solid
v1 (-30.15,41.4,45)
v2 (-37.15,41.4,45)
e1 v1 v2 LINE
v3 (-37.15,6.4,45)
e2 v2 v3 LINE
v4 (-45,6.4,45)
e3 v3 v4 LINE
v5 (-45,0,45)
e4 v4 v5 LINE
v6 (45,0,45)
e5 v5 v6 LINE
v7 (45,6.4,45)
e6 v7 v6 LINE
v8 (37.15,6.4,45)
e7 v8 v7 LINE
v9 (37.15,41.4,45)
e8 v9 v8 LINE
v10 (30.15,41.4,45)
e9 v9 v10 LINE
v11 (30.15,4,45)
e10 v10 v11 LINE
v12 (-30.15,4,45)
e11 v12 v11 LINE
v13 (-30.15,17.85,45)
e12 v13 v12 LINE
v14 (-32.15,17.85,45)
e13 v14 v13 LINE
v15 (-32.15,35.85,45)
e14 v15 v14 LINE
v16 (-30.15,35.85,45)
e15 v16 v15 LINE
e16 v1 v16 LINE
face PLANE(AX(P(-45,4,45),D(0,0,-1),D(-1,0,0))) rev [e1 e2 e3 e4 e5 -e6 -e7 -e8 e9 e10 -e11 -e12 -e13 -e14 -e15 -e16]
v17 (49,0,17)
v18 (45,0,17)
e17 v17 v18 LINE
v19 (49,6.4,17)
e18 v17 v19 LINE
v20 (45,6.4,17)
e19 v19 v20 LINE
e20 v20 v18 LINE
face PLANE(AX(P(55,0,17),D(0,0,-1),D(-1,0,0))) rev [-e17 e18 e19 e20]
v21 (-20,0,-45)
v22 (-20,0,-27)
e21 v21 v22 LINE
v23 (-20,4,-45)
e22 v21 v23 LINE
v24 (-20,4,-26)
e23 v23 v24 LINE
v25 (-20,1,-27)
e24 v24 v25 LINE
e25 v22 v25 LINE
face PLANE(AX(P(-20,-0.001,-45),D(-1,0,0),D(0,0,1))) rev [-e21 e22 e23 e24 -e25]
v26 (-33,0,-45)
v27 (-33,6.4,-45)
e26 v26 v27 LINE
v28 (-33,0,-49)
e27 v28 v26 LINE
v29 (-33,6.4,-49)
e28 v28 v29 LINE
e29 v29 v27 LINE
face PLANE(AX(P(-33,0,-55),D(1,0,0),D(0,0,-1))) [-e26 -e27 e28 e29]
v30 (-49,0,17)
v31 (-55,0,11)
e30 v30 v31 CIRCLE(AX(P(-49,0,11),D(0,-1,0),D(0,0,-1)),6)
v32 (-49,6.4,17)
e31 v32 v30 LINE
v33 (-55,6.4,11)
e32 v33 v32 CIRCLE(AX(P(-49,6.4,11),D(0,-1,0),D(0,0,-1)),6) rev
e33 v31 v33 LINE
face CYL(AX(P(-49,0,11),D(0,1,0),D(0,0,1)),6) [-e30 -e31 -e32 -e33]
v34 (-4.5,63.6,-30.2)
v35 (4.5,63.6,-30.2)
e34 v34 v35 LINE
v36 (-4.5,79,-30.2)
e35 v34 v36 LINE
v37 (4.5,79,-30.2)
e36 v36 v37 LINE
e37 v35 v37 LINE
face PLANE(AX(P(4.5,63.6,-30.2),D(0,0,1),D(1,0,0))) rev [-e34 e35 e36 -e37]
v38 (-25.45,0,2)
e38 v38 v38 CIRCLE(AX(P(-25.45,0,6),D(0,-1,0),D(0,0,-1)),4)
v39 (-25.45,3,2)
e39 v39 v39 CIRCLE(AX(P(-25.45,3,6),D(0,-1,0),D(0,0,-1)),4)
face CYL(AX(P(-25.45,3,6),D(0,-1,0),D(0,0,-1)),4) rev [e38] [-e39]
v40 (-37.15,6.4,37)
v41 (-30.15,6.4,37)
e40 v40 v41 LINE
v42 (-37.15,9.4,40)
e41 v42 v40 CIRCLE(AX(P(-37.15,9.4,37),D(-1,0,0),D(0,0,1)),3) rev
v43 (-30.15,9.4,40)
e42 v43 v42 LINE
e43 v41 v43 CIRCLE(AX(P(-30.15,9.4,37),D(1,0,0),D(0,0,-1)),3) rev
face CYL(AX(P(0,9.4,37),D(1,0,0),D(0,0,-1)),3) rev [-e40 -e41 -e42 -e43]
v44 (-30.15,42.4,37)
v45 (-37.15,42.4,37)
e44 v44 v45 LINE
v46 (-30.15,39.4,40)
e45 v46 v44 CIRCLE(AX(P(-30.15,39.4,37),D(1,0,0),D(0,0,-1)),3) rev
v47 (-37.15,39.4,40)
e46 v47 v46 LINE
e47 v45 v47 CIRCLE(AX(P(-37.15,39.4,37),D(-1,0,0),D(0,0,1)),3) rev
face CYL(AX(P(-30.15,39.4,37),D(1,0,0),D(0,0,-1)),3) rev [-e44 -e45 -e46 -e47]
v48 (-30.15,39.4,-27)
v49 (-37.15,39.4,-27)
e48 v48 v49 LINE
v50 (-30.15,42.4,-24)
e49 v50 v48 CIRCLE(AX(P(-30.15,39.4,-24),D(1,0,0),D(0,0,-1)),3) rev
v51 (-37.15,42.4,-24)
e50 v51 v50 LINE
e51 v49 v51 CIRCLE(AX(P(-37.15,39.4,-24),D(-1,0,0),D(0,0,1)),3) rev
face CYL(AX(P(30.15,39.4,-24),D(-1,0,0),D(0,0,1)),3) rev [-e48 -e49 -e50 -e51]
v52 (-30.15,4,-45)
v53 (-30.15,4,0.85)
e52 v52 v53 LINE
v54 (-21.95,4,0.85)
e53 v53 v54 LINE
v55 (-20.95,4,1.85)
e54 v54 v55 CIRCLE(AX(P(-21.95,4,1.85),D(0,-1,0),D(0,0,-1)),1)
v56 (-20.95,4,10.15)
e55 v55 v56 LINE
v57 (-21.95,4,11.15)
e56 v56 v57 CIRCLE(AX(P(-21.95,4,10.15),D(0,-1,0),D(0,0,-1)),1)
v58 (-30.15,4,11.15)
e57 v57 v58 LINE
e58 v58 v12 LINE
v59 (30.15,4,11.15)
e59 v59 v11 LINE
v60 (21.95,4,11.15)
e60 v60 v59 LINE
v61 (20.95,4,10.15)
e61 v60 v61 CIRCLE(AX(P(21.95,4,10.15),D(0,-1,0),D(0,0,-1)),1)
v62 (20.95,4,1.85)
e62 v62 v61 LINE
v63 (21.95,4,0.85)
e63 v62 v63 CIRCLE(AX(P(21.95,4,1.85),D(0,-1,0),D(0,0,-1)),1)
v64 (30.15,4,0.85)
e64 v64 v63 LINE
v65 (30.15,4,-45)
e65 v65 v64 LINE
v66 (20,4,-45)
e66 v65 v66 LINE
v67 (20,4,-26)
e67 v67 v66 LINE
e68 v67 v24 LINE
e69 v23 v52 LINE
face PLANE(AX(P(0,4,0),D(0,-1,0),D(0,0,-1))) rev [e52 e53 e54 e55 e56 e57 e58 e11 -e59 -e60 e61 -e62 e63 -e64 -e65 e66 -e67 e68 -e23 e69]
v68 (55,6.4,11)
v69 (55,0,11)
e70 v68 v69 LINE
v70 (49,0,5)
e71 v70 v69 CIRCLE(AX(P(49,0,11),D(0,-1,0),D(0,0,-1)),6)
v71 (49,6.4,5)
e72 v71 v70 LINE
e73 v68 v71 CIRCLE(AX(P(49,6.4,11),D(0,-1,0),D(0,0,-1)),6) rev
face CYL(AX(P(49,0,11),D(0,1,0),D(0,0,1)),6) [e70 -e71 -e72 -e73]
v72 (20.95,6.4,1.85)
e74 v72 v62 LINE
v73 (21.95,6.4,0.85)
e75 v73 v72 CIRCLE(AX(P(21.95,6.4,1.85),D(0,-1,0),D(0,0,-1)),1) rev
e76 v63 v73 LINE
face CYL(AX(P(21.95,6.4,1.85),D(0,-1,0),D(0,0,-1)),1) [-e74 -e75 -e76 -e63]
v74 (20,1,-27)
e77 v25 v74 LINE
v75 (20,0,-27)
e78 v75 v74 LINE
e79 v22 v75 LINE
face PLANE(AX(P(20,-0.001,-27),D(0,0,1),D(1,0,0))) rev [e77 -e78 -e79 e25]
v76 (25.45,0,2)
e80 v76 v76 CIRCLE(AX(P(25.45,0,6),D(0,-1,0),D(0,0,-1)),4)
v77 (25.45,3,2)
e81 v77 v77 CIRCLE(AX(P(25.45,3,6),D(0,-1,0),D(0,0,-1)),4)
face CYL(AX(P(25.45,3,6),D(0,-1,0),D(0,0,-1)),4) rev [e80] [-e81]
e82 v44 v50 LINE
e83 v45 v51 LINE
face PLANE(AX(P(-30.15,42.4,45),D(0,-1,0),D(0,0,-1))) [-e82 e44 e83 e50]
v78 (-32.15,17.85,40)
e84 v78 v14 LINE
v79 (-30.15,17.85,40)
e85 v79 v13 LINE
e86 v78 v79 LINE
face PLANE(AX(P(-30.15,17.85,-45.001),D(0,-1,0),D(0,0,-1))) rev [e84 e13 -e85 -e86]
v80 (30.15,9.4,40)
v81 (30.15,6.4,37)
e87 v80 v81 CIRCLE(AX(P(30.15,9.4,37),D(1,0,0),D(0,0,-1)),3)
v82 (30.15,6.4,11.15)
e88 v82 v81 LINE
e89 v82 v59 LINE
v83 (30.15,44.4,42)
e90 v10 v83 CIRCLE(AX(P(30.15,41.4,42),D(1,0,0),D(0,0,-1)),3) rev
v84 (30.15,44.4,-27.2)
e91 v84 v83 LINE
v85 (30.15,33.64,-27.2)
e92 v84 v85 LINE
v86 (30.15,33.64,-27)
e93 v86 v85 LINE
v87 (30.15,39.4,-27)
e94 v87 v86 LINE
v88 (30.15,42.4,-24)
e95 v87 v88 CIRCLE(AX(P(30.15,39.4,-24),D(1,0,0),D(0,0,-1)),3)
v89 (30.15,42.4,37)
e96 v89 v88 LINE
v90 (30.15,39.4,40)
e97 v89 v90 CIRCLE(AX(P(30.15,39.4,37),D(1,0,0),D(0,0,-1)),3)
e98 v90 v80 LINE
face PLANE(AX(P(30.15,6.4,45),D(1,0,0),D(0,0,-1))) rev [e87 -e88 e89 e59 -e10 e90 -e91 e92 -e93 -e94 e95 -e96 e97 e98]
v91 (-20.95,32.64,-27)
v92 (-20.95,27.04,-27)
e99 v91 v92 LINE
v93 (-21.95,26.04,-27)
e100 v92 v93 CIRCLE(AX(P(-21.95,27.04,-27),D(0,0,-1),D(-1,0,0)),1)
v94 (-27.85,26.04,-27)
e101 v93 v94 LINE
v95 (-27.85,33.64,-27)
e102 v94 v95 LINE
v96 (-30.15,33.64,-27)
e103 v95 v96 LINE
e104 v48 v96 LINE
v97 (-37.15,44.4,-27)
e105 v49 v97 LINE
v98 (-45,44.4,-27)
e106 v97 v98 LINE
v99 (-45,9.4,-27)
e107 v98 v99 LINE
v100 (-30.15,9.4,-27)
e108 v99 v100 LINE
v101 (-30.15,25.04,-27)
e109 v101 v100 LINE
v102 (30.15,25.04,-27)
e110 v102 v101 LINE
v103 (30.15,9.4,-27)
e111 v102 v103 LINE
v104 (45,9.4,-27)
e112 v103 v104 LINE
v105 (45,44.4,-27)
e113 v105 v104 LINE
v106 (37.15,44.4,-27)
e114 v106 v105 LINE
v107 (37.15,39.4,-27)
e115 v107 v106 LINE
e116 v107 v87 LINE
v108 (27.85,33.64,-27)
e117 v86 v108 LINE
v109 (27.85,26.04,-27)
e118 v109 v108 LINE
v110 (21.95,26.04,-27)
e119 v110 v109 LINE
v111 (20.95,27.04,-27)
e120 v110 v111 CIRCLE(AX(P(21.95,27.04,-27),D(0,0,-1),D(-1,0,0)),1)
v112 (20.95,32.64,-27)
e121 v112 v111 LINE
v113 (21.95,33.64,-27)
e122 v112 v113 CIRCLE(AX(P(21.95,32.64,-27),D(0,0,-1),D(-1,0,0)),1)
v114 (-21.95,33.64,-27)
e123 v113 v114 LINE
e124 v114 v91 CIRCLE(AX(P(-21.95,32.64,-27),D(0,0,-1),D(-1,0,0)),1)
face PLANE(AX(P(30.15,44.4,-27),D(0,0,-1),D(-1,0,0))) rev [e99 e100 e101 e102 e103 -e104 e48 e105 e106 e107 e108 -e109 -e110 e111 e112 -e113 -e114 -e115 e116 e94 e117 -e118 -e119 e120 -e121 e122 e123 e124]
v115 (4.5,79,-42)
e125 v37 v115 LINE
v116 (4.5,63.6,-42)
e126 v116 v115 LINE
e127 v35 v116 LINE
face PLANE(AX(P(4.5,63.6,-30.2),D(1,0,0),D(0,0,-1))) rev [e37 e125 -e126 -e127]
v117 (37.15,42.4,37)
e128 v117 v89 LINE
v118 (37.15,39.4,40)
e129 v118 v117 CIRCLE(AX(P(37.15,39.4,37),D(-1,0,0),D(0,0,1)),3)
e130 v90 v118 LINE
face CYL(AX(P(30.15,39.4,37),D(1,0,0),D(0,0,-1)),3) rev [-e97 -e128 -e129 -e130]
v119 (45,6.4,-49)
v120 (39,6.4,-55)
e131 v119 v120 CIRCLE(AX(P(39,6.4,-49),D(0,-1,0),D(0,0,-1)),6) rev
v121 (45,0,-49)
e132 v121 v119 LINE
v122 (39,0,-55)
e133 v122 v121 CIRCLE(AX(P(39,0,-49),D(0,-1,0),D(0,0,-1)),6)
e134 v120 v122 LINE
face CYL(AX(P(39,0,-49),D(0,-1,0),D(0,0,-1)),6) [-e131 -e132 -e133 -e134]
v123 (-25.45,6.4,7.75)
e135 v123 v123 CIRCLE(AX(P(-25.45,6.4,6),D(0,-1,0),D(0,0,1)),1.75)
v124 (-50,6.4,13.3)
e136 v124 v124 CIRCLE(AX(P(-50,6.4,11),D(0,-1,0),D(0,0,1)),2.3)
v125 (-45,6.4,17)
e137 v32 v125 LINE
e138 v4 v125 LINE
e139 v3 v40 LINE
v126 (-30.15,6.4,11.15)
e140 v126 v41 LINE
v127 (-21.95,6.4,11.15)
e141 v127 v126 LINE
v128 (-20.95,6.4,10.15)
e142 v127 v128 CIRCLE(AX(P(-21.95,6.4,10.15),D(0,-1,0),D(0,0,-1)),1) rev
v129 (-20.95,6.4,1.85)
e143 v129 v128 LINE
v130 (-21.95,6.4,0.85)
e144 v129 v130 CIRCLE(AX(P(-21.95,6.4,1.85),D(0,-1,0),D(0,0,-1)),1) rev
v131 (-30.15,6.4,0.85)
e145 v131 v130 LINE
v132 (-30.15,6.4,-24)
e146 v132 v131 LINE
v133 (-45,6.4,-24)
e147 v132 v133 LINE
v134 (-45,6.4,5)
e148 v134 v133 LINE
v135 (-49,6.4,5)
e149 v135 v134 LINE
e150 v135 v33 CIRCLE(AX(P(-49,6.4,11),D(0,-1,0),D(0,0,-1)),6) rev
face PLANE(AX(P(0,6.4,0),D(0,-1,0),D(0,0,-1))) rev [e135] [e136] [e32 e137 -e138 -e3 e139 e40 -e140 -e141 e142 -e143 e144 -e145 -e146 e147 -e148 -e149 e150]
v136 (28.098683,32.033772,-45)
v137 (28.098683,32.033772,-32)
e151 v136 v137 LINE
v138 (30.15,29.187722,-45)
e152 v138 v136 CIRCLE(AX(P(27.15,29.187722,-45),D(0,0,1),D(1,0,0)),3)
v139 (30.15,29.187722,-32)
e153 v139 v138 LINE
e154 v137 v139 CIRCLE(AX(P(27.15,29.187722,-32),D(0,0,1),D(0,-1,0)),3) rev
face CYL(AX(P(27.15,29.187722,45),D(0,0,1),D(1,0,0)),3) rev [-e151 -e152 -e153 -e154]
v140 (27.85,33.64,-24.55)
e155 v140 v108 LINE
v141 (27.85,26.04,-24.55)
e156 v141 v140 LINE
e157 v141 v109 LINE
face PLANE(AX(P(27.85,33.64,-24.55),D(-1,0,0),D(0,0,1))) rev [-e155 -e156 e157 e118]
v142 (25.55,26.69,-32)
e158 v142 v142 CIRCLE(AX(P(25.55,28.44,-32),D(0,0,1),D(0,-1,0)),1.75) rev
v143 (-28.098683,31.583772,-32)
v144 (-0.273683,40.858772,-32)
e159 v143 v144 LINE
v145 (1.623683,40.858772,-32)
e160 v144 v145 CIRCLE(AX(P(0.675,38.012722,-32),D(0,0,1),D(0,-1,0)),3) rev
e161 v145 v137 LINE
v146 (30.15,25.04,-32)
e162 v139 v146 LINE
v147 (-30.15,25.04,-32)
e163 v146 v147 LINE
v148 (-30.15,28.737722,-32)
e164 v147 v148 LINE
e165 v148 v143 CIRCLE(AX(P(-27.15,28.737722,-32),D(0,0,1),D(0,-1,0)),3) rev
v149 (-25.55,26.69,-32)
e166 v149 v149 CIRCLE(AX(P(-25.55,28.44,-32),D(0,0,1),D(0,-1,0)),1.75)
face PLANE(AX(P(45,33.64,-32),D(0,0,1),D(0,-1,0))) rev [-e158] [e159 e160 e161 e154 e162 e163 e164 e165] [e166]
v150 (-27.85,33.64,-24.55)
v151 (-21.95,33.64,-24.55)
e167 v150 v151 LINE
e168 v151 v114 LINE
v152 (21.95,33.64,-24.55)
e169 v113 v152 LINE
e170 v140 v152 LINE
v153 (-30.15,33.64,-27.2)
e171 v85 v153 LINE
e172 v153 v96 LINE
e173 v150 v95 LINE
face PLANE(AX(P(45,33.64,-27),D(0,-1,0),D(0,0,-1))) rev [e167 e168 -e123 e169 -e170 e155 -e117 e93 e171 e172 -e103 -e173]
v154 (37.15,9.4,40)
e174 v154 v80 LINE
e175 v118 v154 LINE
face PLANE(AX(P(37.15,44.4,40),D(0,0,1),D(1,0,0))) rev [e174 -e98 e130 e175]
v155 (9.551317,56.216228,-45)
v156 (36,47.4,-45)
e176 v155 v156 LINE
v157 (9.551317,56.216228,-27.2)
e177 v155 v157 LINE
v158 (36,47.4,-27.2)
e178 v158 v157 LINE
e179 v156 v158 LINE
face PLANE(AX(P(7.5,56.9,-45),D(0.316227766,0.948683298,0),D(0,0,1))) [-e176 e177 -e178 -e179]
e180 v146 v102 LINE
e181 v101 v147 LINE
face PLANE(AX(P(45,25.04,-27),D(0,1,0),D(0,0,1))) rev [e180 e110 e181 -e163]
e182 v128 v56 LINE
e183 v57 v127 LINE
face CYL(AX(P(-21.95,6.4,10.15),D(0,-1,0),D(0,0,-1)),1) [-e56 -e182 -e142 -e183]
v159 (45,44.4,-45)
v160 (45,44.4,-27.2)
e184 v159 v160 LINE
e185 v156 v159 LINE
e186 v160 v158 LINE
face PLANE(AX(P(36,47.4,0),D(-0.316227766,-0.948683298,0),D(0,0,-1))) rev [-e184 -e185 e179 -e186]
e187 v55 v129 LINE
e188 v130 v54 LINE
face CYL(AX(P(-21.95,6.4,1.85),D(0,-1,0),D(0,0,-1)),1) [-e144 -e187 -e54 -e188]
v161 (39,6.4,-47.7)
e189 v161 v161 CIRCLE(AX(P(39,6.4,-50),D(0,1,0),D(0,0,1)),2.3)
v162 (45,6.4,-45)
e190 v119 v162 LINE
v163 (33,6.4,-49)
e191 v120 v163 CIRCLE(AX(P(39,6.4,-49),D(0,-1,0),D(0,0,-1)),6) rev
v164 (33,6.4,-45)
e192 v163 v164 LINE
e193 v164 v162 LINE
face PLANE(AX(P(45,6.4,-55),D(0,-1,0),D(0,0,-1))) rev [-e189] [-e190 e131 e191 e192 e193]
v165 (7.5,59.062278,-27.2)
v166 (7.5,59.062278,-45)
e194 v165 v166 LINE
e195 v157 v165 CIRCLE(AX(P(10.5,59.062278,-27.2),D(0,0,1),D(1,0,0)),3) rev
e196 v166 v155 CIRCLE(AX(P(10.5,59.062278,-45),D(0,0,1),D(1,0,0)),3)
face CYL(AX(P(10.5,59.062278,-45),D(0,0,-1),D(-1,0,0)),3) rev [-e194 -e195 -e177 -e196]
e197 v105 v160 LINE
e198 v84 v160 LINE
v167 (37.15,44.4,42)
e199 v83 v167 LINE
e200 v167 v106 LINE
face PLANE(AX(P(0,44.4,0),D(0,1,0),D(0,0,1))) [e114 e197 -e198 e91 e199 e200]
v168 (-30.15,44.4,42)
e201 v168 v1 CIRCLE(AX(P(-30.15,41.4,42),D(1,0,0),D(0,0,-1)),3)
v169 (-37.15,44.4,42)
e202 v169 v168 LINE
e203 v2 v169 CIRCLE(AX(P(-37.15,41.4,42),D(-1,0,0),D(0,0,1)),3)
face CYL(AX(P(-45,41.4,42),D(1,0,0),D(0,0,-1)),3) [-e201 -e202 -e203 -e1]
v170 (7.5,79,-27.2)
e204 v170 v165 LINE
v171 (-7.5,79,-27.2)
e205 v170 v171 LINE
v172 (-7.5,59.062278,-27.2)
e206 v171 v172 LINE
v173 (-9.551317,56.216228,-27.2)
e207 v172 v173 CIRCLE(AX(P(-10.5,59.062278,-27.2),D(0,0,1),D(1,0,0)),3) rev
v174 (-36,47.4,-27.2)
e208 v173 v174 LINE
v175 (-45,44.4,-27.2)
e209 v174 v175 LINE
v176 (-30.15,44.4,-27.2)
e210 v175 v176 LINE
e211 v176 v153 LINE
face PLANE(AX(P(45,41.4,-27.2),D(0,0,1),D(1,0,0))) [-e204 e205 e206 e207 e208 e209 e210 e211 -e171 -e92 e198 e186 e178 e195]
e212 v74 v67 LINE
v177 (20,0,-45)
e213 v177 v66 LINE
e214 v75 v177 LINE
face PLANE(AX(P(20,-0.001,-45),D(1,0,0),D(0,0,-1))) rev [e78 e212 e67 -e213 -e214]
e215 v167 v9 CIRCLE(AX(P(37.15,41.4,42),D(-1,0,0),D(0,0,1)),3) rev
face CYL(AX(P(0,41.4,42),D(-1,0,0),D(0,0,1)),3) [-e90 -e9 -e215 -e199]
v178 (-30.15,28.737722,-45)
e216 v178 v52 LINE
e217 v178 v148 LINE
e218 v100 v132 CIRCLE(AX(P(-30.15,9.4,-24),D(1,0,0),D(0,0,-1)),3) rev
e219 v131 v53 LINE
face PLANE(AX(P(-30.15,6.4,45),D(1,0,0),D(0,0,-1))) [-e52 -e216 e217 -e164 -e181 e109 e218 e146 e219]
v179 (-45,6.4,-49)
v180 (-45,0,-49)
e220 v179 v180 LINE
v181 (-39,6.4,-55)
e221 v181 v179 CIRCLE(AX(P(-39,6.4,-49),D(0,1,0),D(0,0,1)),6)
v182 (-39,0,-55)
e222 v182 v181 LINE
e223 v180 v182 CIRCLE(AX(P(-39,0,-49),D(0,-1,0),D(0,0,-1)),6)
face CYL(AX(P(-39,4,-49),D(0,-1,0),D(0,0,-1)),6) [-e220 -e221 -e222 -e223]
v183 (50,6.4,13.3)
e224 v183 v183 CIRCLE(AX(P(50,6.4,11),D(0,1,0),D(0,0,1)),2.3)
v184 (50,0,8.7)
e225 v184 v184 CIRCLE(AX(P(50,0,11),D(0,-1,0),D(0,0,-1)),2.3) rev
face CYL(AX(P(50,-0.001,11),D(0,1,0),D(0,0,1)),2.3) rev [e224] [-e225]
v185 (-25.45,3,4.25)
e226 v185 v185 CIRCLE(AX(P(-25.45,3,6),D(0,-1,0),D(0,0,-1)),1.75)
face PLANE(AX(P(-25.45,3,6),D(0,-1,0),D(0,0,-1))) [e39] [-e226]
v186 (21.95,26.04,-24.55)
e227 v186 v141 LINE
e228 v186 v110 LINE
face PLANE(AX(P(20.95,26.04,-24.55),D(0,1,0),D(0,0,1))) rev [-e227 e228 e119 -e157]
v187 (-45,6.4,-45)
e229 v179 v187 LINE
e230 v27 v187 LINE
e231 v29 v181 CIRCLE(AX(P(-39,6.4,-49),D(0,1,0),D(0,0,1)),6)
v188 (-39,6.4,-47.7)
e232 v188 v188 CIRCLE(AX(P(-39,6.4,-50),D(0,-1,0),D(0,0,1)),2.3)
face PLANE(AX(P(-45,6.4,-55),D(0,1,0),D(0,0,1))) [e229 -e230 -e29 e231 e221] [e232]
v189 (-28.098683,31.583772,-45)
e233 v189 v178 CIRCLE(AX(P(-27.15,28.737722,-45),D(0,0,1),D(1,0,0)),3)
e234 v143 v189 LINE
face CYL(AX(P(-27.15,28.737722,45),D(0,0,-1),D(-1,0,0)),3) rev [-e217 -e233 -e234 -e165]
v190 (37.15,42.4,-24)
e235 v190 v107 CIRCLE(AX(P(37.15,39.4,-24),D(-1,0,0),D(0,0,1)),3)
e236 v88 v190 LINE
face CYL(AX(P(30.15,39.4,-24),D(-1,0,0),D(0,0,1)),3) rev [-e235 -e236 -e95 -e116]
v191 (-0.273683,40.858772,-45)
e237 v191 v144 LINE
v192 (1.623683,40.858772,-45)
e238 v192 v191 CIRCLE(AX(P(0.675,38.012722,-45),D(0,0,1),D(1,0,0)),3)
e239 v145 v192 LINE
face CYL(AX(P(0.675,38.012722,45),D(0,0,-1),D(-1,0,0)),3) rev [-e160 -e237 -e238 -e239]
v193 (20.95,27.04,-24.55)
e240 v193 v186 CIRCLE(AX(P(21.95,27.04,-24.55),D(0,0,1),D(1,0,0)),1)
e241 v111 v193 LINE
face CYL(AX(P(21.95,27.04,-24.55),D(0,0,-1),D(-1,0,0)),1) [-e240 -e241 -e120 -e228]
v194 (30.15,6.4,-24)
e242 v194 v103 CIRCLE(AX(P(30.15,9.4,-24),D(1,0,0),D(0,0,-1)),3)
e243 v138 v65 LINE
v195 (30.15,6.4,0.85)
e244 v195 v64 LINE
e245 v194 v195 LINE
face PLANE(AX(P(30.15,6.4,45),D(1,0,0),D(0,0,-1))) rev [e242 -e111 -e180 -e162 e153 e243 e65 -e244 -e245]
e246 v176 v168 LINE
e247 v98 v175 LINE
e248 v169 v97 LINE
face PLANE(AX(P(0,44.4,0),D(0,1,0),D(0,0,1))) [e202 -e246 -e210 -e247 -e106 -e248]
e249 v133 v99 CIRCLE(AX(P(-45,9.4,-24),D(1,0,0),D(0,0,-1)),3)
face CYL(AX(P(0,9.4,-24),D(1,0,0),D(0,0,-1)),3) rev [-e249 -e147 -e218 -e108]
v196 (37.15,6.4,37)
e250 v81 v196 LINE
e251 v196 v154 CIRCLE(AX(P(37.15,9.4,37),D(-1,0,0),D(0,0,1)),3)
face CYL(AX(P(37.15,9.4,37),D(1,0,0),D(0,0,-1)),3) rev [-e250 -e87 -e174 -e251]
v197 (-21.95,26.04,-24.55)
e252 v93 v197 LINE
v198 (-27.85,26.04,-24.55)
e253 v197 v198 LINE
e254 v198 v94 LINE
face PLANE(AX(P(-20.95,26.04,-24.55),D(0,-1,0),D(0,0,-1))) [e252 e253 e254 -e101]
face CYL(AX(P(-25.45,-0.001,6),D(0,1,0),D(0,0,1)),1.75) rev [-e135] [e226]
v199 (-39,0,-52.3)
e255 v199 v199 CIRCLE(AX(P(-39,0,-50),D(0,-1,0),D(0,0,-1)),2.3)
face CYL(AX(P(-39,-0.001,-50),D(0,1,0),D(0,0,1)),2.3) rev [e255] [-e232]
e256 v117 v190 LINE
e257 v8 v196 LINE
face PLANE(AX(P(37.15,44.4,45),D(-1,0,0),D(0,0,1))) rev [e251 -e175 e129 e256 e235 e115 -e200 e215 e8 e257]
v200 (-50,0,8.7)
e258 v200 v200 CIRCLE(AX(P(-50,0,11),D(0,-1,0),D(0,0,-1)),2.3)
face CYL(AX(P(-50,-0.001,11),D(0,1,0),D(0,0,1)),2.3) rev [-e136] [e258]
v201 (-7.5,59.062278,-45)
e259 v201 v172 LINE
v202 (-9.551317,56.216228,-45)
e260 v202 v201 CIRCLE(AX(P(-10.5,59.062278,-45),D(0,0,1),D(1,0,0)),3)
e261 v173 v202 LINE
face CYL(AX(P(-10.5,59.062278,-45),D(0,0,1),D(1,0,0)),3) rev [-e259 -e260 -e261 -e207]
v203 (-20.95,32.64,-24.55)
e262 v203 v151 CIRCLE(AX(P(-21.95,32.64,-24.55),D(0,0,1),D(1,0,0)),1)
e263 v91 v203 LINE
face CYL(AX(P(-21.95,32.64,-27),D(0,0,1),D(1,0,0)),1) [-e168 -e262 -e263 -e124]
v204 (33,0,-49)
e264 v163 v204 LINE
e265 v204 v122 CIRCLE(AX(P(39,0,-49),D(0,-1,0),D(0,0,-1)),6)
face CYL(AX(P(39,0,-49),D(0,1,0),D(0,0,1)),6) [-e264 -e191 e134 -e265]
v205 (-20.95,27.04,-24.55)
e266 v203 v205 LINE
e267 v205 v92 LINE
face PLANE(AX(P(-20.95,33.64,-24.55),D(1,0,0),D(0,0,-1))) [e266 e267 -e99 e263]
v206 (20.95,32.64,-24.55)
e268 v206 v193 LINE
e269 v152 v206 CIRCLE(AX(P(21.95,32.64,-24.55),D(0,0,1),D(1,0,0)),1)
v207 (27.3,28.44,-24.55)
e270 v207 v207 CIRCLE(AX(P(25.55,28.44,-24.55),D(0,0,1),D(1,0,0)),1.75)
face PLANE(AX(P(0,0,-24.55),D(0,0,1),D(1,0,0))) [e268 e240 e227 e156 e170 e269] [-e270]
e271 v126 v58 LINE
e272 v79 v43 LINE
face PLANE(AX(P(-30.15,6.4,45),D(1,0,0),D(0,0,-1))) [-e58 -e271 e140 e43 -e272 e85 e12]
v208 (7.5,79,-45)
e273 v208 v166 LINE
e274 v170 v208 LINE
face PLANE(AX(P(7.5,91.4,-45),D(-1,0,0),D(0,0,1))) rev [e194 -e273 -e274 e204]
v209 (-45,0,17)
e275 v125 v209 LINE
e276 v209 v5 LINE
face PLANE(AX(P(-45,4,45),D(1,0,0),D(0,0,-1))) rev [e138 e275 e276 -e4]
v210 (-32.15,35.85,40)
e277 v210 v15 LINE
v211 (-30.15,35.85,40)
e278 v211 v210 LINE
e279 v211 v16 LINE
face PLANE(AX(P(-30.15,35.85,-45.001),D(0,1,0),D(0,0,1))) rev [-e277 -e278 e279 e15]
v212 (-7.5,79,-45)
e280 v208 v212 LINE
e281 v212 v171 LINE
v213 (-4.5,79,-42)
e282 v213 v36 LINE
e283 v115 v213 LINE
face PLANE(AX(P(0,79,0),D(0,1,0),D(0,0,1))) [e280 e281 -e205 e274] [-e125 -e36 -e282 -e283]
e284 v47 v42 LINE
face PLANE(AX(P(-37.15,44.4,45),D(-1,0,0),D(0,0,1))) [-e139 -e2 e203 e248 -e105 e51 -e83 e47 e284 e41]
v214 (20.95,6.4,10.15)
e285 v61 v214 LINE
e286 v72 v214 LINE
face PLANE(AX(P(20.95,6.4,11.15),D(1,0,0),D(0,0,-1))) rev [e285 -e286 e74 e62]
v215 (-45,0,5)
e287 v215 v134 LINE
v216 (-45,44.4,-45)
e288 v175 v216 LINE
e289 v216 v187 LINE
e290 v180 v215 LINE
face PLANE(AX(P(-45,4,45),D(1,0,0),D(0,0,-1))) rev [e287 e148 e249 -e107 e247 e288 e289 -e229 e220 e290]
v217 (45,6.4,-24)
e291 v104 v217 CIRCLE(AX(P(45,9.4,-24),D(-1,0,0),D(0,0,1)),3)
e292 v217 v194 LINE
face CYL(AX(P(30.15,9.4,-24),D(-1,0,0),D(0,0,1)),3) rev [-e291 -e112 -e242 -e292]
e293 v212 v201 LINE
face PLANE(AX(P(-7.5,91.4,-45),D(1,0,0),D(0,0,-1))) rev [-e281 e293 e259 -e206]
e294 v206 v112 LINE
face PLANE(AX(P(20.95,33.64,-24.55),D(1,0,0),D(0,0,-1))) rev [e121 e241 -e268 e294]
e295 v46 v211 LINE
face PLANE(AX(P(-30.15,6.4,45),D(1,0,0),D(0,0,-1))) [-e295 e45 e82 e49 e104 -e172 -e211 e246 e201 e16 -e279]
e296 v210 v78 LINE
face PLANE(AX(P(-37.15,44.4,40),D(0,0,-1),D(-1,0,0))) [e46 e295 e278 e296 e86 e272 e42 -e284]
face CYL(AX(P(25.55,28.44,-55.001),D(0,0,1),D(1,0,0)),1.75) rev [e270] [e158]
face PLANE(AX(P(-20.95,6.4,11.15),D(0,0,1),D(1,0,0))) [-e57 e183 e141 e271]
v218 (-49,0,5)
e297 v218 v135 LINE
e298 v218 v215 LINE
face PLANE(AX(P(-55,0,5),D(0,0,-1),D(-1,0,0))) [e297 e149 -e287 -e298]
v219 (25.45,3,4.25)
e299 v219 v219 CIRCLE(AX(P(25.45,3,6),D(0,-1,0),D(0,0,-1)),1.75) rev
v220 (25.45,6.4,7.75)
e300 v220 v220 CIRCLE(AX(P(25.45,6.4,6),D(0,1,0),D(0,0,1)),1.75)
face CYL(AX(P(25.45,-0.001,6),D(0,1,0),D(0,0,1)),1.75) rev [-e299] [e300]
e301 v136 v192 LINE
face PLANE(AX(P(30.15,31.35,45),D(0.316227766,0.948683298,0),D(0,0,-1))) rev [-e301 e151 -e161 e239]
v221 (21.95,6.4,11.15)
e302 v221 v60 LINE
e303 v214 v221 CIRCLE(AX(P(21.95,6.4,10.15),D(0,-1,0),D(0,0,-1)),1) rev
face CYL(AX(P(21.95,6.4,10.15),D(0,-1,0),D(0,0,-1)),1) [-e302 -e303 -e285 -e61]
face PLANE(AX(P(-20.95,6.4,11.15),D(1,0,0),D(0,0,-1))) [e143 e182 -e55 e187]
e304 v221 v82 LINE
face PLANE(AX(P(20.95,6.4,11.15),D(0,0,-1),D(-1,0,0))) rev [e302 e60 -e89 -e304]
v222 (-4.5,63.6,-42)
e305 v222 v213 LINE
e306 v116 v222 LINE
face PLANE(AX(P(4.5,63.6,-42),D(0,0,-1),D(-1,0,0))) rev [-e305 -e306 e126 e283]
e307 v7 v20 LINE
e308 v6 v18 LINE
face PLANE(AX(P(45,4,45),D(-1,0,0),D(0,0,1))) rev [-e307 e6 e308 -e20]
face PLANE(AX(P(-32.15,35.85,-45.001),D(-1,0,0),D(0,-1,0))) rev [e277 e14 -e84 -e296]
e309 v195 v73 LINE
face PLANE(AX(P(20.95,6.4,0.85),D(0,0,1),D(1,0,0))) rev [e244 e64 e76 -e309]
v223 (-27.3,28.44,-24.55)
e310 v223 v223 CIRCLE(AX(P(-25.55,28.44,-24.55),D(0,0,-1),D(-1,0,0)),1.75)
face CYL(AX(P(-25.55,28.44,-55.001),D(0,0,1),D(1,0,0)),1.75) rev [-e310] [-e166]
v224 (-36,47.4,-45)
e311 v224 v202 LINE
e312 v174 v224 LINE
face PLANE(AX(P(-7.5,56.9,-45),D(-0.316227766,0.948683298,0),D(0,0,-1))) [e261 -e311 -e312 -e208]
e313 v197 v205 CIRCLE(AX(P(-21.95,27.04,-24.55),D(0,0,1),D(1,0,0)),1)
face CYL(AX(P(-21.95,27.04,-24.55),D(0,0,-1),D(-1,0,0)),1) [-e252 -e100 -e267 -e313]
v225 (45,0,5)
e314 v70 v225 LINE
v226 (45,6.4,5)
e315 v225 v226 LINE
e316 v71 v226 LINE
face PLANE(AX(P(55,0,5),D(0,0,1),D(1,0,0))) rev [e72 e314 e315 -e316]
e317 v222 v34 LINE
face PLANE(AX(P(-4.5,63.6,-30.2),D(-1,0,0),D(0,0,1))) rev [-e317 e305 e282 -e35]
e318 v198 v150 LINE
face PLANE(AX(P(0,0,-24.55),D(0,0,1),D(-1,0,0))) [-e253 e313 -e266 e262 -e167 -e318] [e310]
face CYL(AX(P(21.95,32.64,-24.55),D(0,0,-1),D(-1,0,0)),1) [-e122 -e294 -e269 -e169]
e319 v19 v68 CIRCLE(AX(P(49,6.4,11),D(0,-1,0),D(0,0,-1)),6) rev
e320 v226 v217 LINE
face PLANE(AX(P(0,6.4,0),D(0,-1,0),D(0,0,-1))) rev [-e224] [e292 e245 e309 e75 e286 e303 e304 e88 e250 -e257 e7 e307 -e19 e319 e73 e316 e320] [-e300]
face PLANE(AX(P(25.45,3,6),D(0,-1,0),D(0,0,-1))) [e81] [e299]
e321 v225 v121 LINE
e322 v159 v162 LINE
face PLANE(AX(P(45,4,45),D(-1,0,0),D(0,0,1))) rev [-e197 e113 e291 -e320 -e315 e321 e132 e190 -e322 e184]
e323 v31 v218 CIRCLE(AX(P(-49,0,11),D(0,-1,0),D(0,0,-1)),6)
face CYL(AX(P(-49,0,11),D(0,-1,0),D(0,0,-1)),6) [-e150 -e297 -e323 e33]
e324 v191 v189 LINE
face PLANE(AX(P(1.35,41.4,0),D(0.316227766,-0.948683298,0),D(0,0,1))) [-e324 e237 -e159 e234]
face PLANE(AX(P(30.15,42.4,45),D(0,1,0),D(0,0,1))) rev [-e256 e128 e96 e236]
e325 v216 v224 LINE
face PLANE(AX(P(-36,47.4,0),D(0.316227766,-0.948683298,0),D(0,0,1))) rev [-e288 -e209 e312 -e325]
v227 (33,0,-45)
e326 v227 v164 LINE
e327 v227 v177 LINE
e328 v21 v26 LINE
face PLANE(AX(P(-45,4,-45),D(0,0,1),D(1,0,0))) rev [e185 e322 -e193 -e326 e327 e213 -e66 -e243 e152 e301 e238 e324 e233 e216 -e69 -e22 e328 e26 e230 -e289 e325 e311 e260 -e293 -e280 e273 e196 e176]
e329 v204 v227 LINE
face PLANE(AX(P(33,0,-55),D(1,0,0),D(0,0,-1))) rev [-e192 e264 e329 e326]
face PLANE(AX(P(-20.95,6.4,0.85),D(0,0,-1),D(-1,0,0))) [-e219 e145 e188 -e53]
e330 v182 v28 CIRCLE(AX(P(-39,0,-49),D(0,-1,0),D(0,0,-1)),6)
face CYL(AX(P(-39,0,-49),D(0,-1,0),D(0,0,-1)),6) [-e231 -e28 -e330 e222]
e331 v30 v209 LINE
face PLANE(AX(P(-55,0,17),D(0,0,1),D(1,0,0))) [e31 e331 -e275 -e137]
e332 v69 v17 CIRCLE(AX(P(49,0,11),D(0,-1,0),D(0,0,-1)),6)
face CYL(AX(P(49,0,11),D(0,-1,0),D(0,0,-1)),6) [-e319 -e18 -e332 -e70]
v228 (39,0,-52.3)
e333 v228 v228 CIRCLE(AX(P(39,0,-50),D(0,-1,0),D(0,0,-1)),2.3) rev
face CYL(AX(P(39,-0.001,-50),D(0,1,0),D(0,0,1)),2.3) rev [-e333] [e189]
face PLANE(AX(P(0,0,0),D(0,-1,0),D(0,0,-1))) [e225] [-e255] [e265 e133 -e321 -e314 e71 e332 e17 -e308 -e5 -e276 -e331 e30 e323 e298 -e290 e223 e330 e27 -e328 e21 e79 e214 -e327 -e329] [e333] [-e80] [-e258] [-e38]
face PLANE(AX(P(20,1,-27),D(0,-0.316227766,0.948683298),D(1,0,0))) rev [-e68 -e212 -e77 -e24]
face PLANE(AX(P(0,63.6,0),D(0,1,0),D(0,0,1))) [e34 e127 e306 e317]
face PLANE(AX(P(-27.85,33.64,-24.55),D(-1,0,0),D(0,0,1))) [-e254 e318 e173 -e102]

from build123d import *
from OCP.BRepFilletAPI import BRepFilletAPI_MakeChamfer

# Parameters (mm, degrees)
ESQUISSE2_W              = 90
ESQUISSE2_H              = 90
BOSS_EXTRU_1_DEPTH       = 4
ESQUISSE3_W              = 9.2
ESQUISSE3_H              = 10.3
BOSS_EXTRU_2_DEPTH       = 2.4
CONG_1_R                 = 1
ESQUISSE5_W              = 14.85
ESQUISSE5_H              = 90
BOSS_EXTRU_3_DEPTH       = 2.4
ESQUISSE6_W              = 7
ESQUISSE6_H              = 5
BOSS_EXTRU_4_DEPTH       = 38
ESQUISSE8_W              = 14.85
ESQUISSE8_H              = 18
BOSS_EXTRU_5_DEPTH       = 38
BOSS_EXTRU_6_REACH       = 97.814
ESQUISSE9_W              = 7
ESQUISSE9_H              = 2
SYM_TRIE1_START          = 4
SYM_TRIE1_OUTLINE_W      = 7
SYM_TRIE1_OUTLINE_H      = 5
SYM_TRIE1_OUTLINE_W_2    = 14.85
SYM_TRIE1_OUTLINE_H_2    = 18
SYM_TRIE1_DEPTH          = 40.4
SYM_TRIE1_2_DEPTH        = 2.4
SYM_TRIE1_START_2        = 42.4
SYM_TRIE1_3_OUTLINE_W    = 7
SYM_TRIE1_3_OUTLINE_H    = 67
SYM_TRIE1_3_DEPTH        = 2
ENL_V_MAT_EXTRU_1_REACH  = 111.983
ESQUISSE10_W             = 2
ESQUISSE10_H             = 18
ENL_V_MAT_EXTRU_2_REACH  = 77.38
ESQUISSE11_W             = 40
ESQUISSE11_H             = 18
ESQUISSE12_W             = 5
ESQUISSE12_H             = 8.6
BOSS_EXTRU_7_DEPTH       = 60.3
ESQUISSE13_W             = 6.9
ESQUISSE13_H             = 7.6
BOSS_EXTRU_8_DEPTH       = 2.45
CONG_2_R                 = 1
CONG_2_OF_SYM_TRIE2_R    = 1
BOSS_EXTRU_9_START       = -3
ESQUISSE14_W             = 90
ESQUISSE14_H             = 17.8
BOSS_EXTRU_9_DEPTH       = 6
ESQUISSE15_W             = 15
ESQUISSE15_H             = 17.8
BOSS_EXTRU_10_DEPTH      = 44
ESQUISSE16_W             = 90
ESQUISSE16_H             = 90
BOSS_EXTRU_11_DEPTH      = 11.6
ESQUISSE20_W             = 12
ESQUISSE20_H             = 6.4
BOSS_EXTRU_13_DEPTH      = 10
ESQUISSE21_W             = 12
ESQUISSE21_H             = 6.4
BOSS_EXTRU_14_DEPTH      = 10
CONG_3_R                 = 6
ENL_V_MAT_EXTRU_4_REACH  = 126.022
ESQUISSE23_R             = 2.3
CONG_3_OF_SYM_TRIE3_R    = 6
ENL_V_MAT_EXTRU_5_REACH  = 126.022
ESQUISSE24_R             = 1.75
ENL_V_MAT_EXTRU_6_REACH  = 137.909
ESQUISSE26_R             = 1.75
ESQUISSE27_W             = 50
ESQUISSE27_H             = 4
ENL_V_MAT_EXTRU_7_DEPTH  = 72.2
CHANFREIN3_SIZE          = 28.5
CHANFREIN3_SIZE2         = 9.5
CHANFREIN4_SIZE          = 10
CHANFREIN4_SIZE2         = 17.5
CHANFREIN8_START         = -45
CHANFREIN8_DEPTH         = 17.8
CHANFREIN9_SIZE          = 3
CHANFREIN9_SIZE_2        = 9
CHANFREIN10_START        = 25.930676813
CHANFREIN10_OUTLINE_W    = 40
CHANFREIN10_OUTLINE_H    = 3.16227766
CHANFREIN10_DEPTH        = 2.069323187
CONG_9_R                 = 3
ESQUISSE37_R             = 4
ENL_V_MAT_EXTRU_8_DEPTH  = 3
BOSS_EXTRU_15_DEPTH      = 4.8
CONG_11_R                = 3
CHANFREIN14_SIZE         = 10
CHANFREIN14_SIZE2        = 5
ESQUISSE40_W             = 90
ESQUISSE40_H             = 90
ENL_V_MAT_EXTRU_9_DEPTH  = 24
ESQUISSE41_W             = 9
ESQUISSE41_H             = 11.8
ENL_V_MAT_EXTRU_11_DEPTH = 15.4


with BuildPart() as part:
    # Esquisse2 → Boss.-Extru.1 (new body)
    with BuildSketch(Plane(origin=(0, 0, 0), x_dir=(1, 0, 0), z_dir=(0, 1, 0))):
        Rectangle(ESQUISSE2_W, ESQUISSE2_H)
    extrude(amount=BOSS_EXTRU_1_DEPTH)

    # Esquisse3 → Boss.-Extru.2 (add)
    with BuildSketch(Plane(origin=(0, 4, 0), x_dir=(1, 0, 0), z_dir=(0, 1, 0))):
        with Locations((25.55, -6)):
            Rectangle(ESQUISSE3_W, ESQUISSE3_H)
    extrude(amount=BOSS_EXTRU_2_DEPTH)

    # Congé1
    cong_1_edges = [part.edges().sort_by_distance(p)[0] for p in [
        (20.95, 5.2, 0.85),
        (20.95, 5.2, 11.15),
    ]]
    fillet(cong_1_edges, radius=CONG_1_R)

    # Esquisse5 → Boss.-Extru.3 (add)
    with BuildSketch(Plane(origin=(0, 4, 0), x_dir=(1, 0, 0), z_dir=(0, 1, 0))):
        with Locations((37.575, 0)):
            Rectangle(ESQUISSE5_W, ESQUISSE5_H)
    extrude(amount=BOSS_EXTRU_3_DEPTH)

    # Esquisse6 → Boss.-Extru.4 (add)
    with BuildSketch(Plane(origin=(0, 6.4, 0), x_dir=(1, 0, 0), z_dir=(0, 1, 0))):
        with Locations((33.65, -42.5)):
            Rectangle(ESQUISSE6_W, ESQUISSE6_H)
    extrude(amount=BOSS_EXTRU_4_DEPTH)

    # Esquisse8 → Boss.-Extru.5 (add)
    with BuildSketch(Plane(origin=(0, 6.4, 0), x_dir=(1, 0, 0), z_dir=(0, 1, 0))):
        with Locations((37.575, 36)):
            Rectangle(ESQUISSE8_W, ESQUISSE8_H)
    extrude(amount=BOSS_EXTRU_5_DEPTH)

    # Esquisse9 → Boss.-Extru.6 (add, up to next)
    with BuildSketch(Plane.XY.offset(-27), mode=Mode.PRIVATE) as boss_extru_6_sk1:
        with Locations((33.65, 43.4)):
            Rectangle(ESQUISSE9_W, ESQUISSE9_H)
    boss_extru_6_tool1 = extrude(boss_extru_6_sk1.sketch, amount=BOSS_EXTRU_6_REACH, mode=Mode.PRIVATE) - part.part
    add(boss_extru_6_tool1.solids().sort_by_distance((33.65, 43.4, -27))[0])

    # Symétrie1: read off the stored shape, not the designer's step
    # Symétrie1 outline → Symétrie1 (add)
    with BuildSketch(Plane(origin=(0, 0, 0), x_dir=(1, 0, 0), z_dir=(0, 1, 0)).offset(SYM_TRIE1_START)):
        with Locations((-33.65, -42.5)):
            Rectangle(SYM_TRIE1_OUTLINE_W, SYM_TRIE1_OUTLINE_H)
        with Locations((-37.575, 36)):
            Rectangle(SYM_TRIE1_OUTLINE_W_2, SYM_TRIE1_OUTLINE_H_2)
    extrude(amount=SYM_TRIE1_DEPTH)

    # Sym_trie1 2 outline → Sym_trie1 2 (add)
    with BuildSketch(Plane(origin=(0, 0, 0), x_dir=(1, 0, 0), z_dir=(0, 1, 0)).offset(SYM_TRIE1_START)):
        with BuildLine():
            Line((-37.15, -40), (-30.15, -40))
            Line((-30.15, -40), (-30.15, -11.15))
            Line((-30.15, -11.15), (-21.95, -11.15))
            ThreePointArc((-21.95, -11.15), (-21.242893219, -10.857106781), (-20.95, -10.15))
            Line((-20.95, -10.15), (-20.95, -1.85))
            ThreePointArc((-20.95, -1.85), (-21.242893219, -1.142893219), (-21.95, -0.85))
            Line((-21.95, -0.85), (-30.15, -0.85))
            Line((-30.15, -0.85), (-30.15, 27))
            Line((-30.15, 27), (-45, 27))
            Line((-45, 27), (-45, -45))
            Line((-45, -45), (-37.15, -45))
            Line((-37.15, -45), (-37.15, -40))
        make_face()
    extrude(amount=SYM_TRIE1_2_DEPTH)

    # Sym_trie1 3 outline → Sym_trie1 3 (add)
    with BuildSketch(Plane(origin=(0, 0, 0), x_dir=(1, 0, 0), z_dir=(0, 1, 0)).offset(SYM_TRIE1_START_2)):
        with Locations((-33.65, -6.5)):
            Rectangle(SYM_TRIE1_3_OUTLINE_W, SYM_TRIE1_3_OUTLINE_H)
    extrude(amount=SYM_TRIE1_3_DEPTH)

    # Esquisse10 → Enlèv. mat.-Extru.1 (cut, up to next)
    with BuildSketch(Plane.XY.offset(45), mode=Mode.PRIVATE) as enl_v_mat_extru_1_sk1:
        with Locations((-31.15, 26.85)):
            Rectangle(ESQUISSE10_W, ESQUISSE10_H)
    enl_v_mat_extru_1_tool1 = extrude(enl_v_mat_extru_1_sk1.sketch, amount=-ENL_V_MAT_EXTRU_1_REACH, mode=Mode.PRIVATE) & part.part
    add(enl_v_mat_extru_1_tool1.solids().sort_by_distance((-31.15, 26.85, 45))[0], mode=Mode.SUBTRACT)

    # Esquisse11 → Enlèv. mat.-Extru.2 (cut, up to next)
    with BuildSketch(Plane(origin=(0, 4, 0), x_dir=(1, 0, 0), z_dir=(0, 1, 0)), mode=Mode.PRIVATE) as enl_v_mat_extru_2_sk1:
        with Locations((0, 36)):
            Rectangle(ESQUISSE11_W, ESQUISSE11_H)
    enl_v_mat_extru_2_tool1 = extrude(enl_v_mat_extru_2_sk1.sketch, amount=-ENL_V_MAT_EXTRU_2_REACH, mode=Mode.PRIVATE) & part.part
    add(enl_v_mat_extru_2_tool1.solids().sort_by_distance((0, 4, -36))[0], mode=Mode.SUBTRACT)

    # Esquisse12 → Boss.-Extru.7 (add)
    with BuildSketch(Plane(origin=(-30.15, 0, 0), x_dir=(0, 0, -1), z_dir=(1, 0, 0))):
        with Locations((29.5, 29.34)):
            Rectangle(ESQUISSE12_W, ESQUISSE12_H)
    extrude(amount=BOSS_EXTRU_7_DEPTH)

    # Esquisse13 → Boss.-Extru.8 (add)
    with BuildSketch(Plane.XY.offset(-27)):
        with Locations((24.4, 29.84)):
            Rectangle(ESQUISSE13_W, ESQUISSE13_H)
    boss_extru_8 = extrude(amount=BOSS_EXTRU_8_DEPTH)

    # Congé2
    cong_2_edges = [part.edges().sort_by_distance(p)[0] for p in [
        (20.95, 33.64, -25.775),
        (20.95, 26.04, -25.775),
    ]]
    fillet(cong_2_edges, radius=CONG_2_R)

    # Symétrie2: Boss.-Extru.8 across plane
    add(boss_extru_8.mirror(Plane(origin=(0, 0, 0), x_dir=(0, 0, 1), z_dir=(1, 0, 0))))

    # Congé2 of Symétrie2
    cong_2_of_sym_trie2_edges = [part.edges().sort_by_distance(p)[0] for p in [
        (-20.95, 33.64, -25.775),
        (-20.95, 26.04, -25.775),
    ]]
    fillet(cong_2_of_sym_trie2_edges, radius=CONG_2_OF_SYM_TRIE2_R)

    # Esquisse14 → Boss.-Extru.9 (add)
    with BuildSketch(Plane(origin=(0, 44.4, 0), x_dir=(1, 0, 0), z_dir=(0, 1, 0)).offset(BOSS_EXTRU_9_START)):
        with Locations((0, 36.1)):
            Rectangle(ESQUISSE14_W, ESQUISSE14_H)
    extrude(amount=BOSS_EXTRU_9_DEPTH)

    # Esquisse15 → Boss.-Extru.10 (add)
    with BuildSketch(Plane(origin=(0, 47.4, 0), x_dir=(1, 0, 0), z_dir=(0, 1, 0))):
        with Locations((0, 36.1)):
            Rectangle(ESQUISSE15_W, ESQUISSE15_H)
    extrude(amount=BOSS_EXTRU_10_DEPTH)

    # Esquisse16 → Boss.-Extru.11 (add)
    with BuildSketch(Plane(origin=(0, 91.4, 0), x_dir=(1, 0, 0), z_dir=(0, 1, 0))):
        Rectangle(ESQUISSE16_W, ESQUISSE16_H)
    extrude(amount=BOSS_EXTRU_11_DEPTH)

    # Esquisse20 → Boss.-Extru.13 (add)
    with BuildSketch(Plane(origin=(45, 0, 0), x_dir=(0, 0, -1), z_dir=(1, 0, 0))):
        with Locations((-11, 3.2)):
            Rectangle(ESQUISSE20_W, ESQUISSE20_H)
    boss_extru_13 = extrude(amount=BOSS_EXTRU_13_DEPTH)

    # Esquisse21 → Boss.-Extru.14 (add)
    with BuildSketch(Plane(origin=(0, 0, -45), x_dir=(-1, 0, 0), z_dir=(0, 0, -1))):
        with Locations((-39, 3.2)):
            Rectangle(ESQUISSE21_W, ESQUISSE21_H)
    boss_extru_14 = extrude(amount=BOSS_EXTRU_14_DEPTH)

    # Congé3
    cong_3_edges = [part.edges().sort_by_distance(p)[0] for p in [
        (33, 3.2, -55),
        (45, 3.2, -55),
        (55, 3.2, 5),
        (55, 3.2, 17),
    ]]
    fillet(cong_3_edges, radius=CONG_3_R - 0.0001)  # a hair under: the kernel refuses the full size

    # Esquisse23 → Enlèv. mat.-Extru.4 (cut, up to next)
    with BuildSketch(Plane(origin=(0, 6.4, 0), x_dir=(1, 0, 0), z_dir=(0, 1, 0)), mode=Mode.PRIVATE) as enl_v_mat_extru_4_sk1:
        with Locations(Location((50, -11, 0), (0, 0, 270))):
            Circle(ESQUISSE23_R)
    enl_v_mat_extru_4_tool1 = extrude(enl_v_mat_extru_4_sk1.sketch, amount=-ENL_V_MAT_EXTRU_4_REACH, mode=Mode.PRIVATE) & part.part
    # Esquisse23 → Enlèv. mat.-Extru.4 (cut, up to next)
    with BuildSketch(Plane(origin=(0, 6.4, 0), x_dir=(1, 0, 0), z_dir=(0, 1, 0)), mode=Mode.PRIVATE) as enl_v_mat_extru_4_sk2:
        with Locations(Location((39, 50, 0), (0, 0, 270))):
            Circle(ESQUISSE23_R)
    enl_v_mat_extru_4_tool2 = extrude(enl_v_mat_extru_4_sk2.sketch, amount=-ENL_V_MAT_EXTRU_4_REACH, mode=Mode.PRIVATE) & part.part
    enl_v_mat_extru_4_1 = enl_v_mat_extru_4_tool1.solids().sort_by_distance((50, 6.4, 11))[0]
    add(enl_v_mat_extru_4_1, mode=Mode.SUBTRACT)
    enl_v_mat_extru_4_2 = enl_v_mat_extru_4_tool2.solids().sort_by_distance((39, 6.4, -50))[0]
    add(enl_v_mat_extru_4_2, mode=Mode.SUBTRACT)
    enl_v_mat_extru_4 = enl_v_mat_extru_4_1 + enl_v_mat_extru_4_2  # Enlèv. mat.-Extru.4 as one shape, for the pattern or mirror that repeats it

    # Symétrie3: Boss.-Extru.13, Boss.-Extru.14, Enlèv. mat.-Extru.4 across plane
    add(boss_extru_13.mirror(Plane(origin=(0, 0, 0), x_dir=(0, 0, 1), z_dir=(1, 0, 0))))
    add(boss_extru_14.mirror(Plane(origin=(0, 0, 0), x_dir=(0, 0, 1), z_dir=(1, 0, 0))))
    add(enl_v_mat_extru_4.mirror(Plane(origin=(0, 0, 0), x_dir=(0, 0, 1), z_dir=(1, 0, 0))), mode=Mode.SUBTRACT)

    # Congé3 of Symétrie3
    cong_3_of_sym_trie3_edges = [part.edges().sort_by_distance(p)[0] for p in [
        (-33, 3.2, -55),
        (-45, 3.2, -55),
        (-55, 3.2, 5),
        (-55, 3.2, 17),
    ]]
    fillet(cong_3_of_sym_trie3_edges, radius=CONG_3_OF_SYM_TRIE3_R - 0.0001)  # a hair under: the kernel refuses the full size

    # Esquisse24 → Enlèv. mat.-Extru.5 (cut, up to next)
    with BuildSketch(Plane(origin=(0, 6.4, 0), x_dir=(1, 0, 0), z_dir=(0, 1, 0)), mode=Mode.PRIVATE) as enl_v_mat_extru_5_sk1:
        with Locations(Location((25.45, -6, 0), (0, 0, 270))):
            Circle(ESQUISSE24_R)
    enl_v_mat_extru_5_tool1 = extrude(enl_v_mat_extru_5_sk1.sketch, amount=-ENL_V_MAT_EXTRU_5_REACH, mode=Mode.PRIVATE) & part.part
    enl_v_mat_extru_5 = enl_v_mat_extru_5_tool1.solids().sort_by_distance((25.45, 6.4, 6))[0]
    add(enl_v_mat_extru_5, mode=Mode.SUBTRACT)

    # Esquisse26 → Enlèv. mat.-Extru.6 (cut, up to next)
    with BuildSketch(Plane.XY.offset(-24.55), mode=Mode.PRIVATE) as enl_v_mat_extru_6_sk1:
        with Locations((25.55, 28.44)):
            Circle(ESQUISSE26_R)
    enl_v_mat_extru_6_tool1 = extrude(enl_v_mat_extru_6_sk1.sketch, amount=-ENL_V_MAT_EXTRU_6_REACH, mode=Mode.PRIVATE) & part.part
    enl_v_mat_extru_6 = enl_v_mat_extru_6_tool1.solids().sort_by_distance((25.55, 28.44, -24.55))[0]
    add(enl_v_mat_extru_6, mode=Mode.SUBTRACT)

    # Symétrie5: Enlèv. mat.-Extru.5, Enlèv. mat.-Extru.6 across plane
    add(enl_v_mat_extru_5.mirror(Plane(origin=(0, 0, 0), x_dir=(0, 0, 1), z_dir=(1, 0, 0))), mode=Mode.SUBTRACT)
    add(enl_v_mat_extru_6.mirror(Plane(origin=(0, 0, 0), x_dir=(0, 0, 1), z_dir=(1, 0, 0))), mode=Mode.SUBTRACT)

    # Esquisse27 → Enlèv. mat.-Extru.7 (cut)
    with BuildSketch(Plane.XY.offset(45)):
        with Locations((0, 93.4)):
            Rectangle(ESQUISSE27_W, ESQUISSE27_H)
    extrude(amount=-ENL_V_MAT_EXTRU_7_DEPTH, mode=Mode.SUBTRACT)

    # Chanfrein3: one chamfer whose edges measure the first distance from different faces: ONE call of the kernel's chamfer builder (chamfer() names one face for all edges)
    chanfrein3_edges_1 = [part.edges().sort_by_distance(p)[0] for p in [
        (-7.5, 47.4, -36.1),
    ]]
    chanfrein3_side_1 = [part.faces().sort_by_distance(p)[0] for p in [
        (-26.25, 47.4, -36.1),
    ]]
    chanfrein3_edges_2 = [part.edges().sort_by_distance(p)[0] for p in [
        (7.5, 47.4, -36.1),
    ]]
    chanfrein3_side_2 = [part.faces().sort_by_distance(p)[0] for p in [
        (26.25, 47.4, -36.1),
    ]]
    chanfrein3 = BRepFilletAPI_MakeChamfer(part.part.solid().wrapped)
    for e in chanfrein3_edges_1:
        chanfrein3.Add(CHANFREIN3_SIZE, CHANFREIN3_SIZE2, e.wrapped, chanfrein3_side_1[0].wrapped)  # the first distance lies on this face
    for e in chanfrein3_edges_2:
        chanfrein3.Add(CHANFREIN3_SIZE, CHANFREIN3_SIZE2, e.wrapped, chanfrein3_side_2[0].wrapped)  # the first distance lies on this face
    add(Compound.cast(chanfrein3.Shape()), mode=Mode.REPLACE)

    # Chanfrein4: one chamfer whose edges measure the first distance from different faces: ONE call of the kernel's chamfer builder (chamfer() names one face for all edges)
    chanfrein4_edges_1 = [part.edges().sort_by_distance(p)[0] for p in [
        (7.5, 91.4, -36.1),
    ]]
    chanfrein4_side_1 = [part.faces().sort_by_distance(p)[0] for p in [
        (7.5, 74.15, -36.1),
    ]]
    chanfrein4_edges_2 = [part.edges().sort_by_distance(p)[0] for p in [
        (-7.5, 91.4, -36.1),
    ]]
    chanfrein4_side_2 = [part.faces().sort_by_distance(p)[0] for p in [
        (-7.5, 74.15, -36.1),
    ]]
    chanfrein4 = BRepFilletAPI_MakeChamfer(part.part.solid().wrapped)
    for e in chanfrein4_edges_1:
        chanfrein4.Add(CHANFREIN4_SIZE, CHANFREIN4_SIZE2, e.wrapped, chanfrein4_side_1[0].wrapped)  # the first distance lies on this face
    for e in chanfrein4_edges_2:
        chanfrein4.Add(CHANFREIN4_SIZE, CHANFREIN4_SIZE2, e.wrapped, chanfrein4_side_2[0].wrapped)  # the first distance lies on this face
    add(Compound.cast(chanfrein4.Shape()), mode=Mode.REPLACE)

    # Chanfrein8: read off the stored shape, not the designer's step
    # Chanfrein8 outline → Chanfrein8 (add)
    with BuildSketch(Plane.XY.offset(CHANFREIN8_START)):
        Polygon((30.15, 31.35), (30.15, 41.4), (0, 41.4), align=None)
    extrude(amount=CHANFREIN8_DEPTH)

    # Chanfrein9
    chanfrein9_edges_1 = [part.edges().sort_by_distance(p)[0] for p in [
        (45, 47.4, -36.1),
    ]]
    chanfrein9_side_1 = [part.faces().sort_by_distance(p)[0] for p in [
        (45, 47.34, -36.1),
    ]]
    chanfrein9_edges_2 = [part.edges().sort_by_distance(p)[0] for p in [
        (-45, 47.4, -36.1),
    ]]
    chanfrein9_side_2 = [part.faces().sort_by_distance(p)[0] for p in [
        (-44.94, 47.4, -36.1),
    ]]
    chanfrein9 = BRepFilletAPI_MakeChamfer(part.part.solid().wrapped)
    for e in chanfrein9_edges_1:
        chanfrein9.Add(CHANFREIN9_SIZE - 0.0001, CHANFREIN9_SIZE_2 - 0.0001, e.wrapped, chanfrein9_side_1[0].wrapped)
    for e in chanfrein9_edges_2:
        chanfrein9.Add(CHANFREIN9_SIZE_2 - 0.0001, CHANFREIN9_SIZE - 0.0001, e.wrapped, chanfrein9_side_2[0].wrapped)
    add(Compound.cast(chanfrein9.Shape()), mode=Mode.REPLACE)  # a hair under: the kernel refuses the full size

    # Chanfrein10: read off the stored shape, not the designer's step
    # Chanfrein10 outline → Chanfrein10 (cut)
    with BuildSketch(Plane(origin=(0, 0, 0), x_dir=(1, 0, 0), z_dir=(0, 0.31622776601683705, -0.9486832980505141)).offset(CHANFREIN10_START)):
        with Locations((0, 6.008327554)):
            Rectangle(CHANFREIN10_OUTLINE_W, CHANFREIN10_OUTLINE_H)
    extrude(amount=CHANFREIN10_DEPTH, mode=Mode.SUBTRACT)

    # Congé9
    cong_9_edges = [part.edges().sort_by_distance(p)[0] for p in [
        (-33.65, 44.4, 45),
        (-33.65, 6.4, 40),
        (-37.575, 6.4, -27),
        (-33.65, 42.4, 40),
        (-33.65, 42.4, -27),
        (33.65, 6.4, 40),
        (33.65, 44.4, 45),
        (37.575, 6.4, -27),
        (33.65, 42.4, 40),
        (33.65, 42.4, -27),
    ]]
    fillet(cong_9_edges, radius=CONG_9_R)

    # Chanfrein13
    # the kernel refuses this chamfer: 31.5, 10.5 mm, written as the material it adds along each edge
    with BuildSketch(Plane(origin=(-30.15, 41.4, -27.2), x_dir=(0, -1, 0), z_dir=(0, 0, -1))) as chanfrein13_piece_1:
        with BuildLine():
            Line((10.898446985, 1.195340956), (-0.398446985, -32.695340956))
            Line((-0.398446985, -32.695340956), (-1.028446985, -32.695340956))
            ThreePointArc((-1.028446985, -32.695340956), (-0.63, -16.347670478), (-0.63, 0))
            Line((-0.63, 0), (0, 0.63))
            ThreePointArc((0, 0.63), (5.449223493, 0.63), (10.898446985, 1.825340956))
            Line((10.898446985, 1.825340956), (10.898446985, 1.195340956))
        make_face()
    extrude(amount=17.8)

    # Esquisse37 → Enlèv. mat.-Extru.8 (cut)
    with BuildSketch(Plane.XZ):
        with Locations(Location((-25.45, 6, 0), (0, 0, 270))):
            Circle(ESQUISSE37_R)
        with Locations(Location((25.45, 6, 0), (0, 0, 270))):
            Circle(ESQUISSE37_R)
    extrude(amount=-ENL_V_MAT_EXTRU_8_DEPTH, mode=Mode.SUBTRACT)

    # Esquisse38 → Boss.-Extru.15 (add)
    with BuildSketch(Plane.XY.offset(-27.2)):
        Polygon((0.675, 41.175), (-21.95, 33.64), (23.28, 33.64), align=None)
    extrude(amount=-BOSS_EXTRU_15_DEPTH)

    # Congé11
    cong_11_edges = [part.edges().sort_by_distance(p)[0] for p in [
        (7.5, 56.9, -36.1),
        (-7.5, 56.9, -36.1),
        (-25, 91.4, -36.1),
        (-7.5, 81.4, -36.1),
        (25, 91.4, -36.1),
        (7.5, 81.4, -36.1),
        (30.15, 31.35, -38.5),
        (-30.15, 30.9, -38.5),
        (0.675, 41.175, -38.5),
    ]]
    fillet(cong_11_edges, radius=CONG_11_R)

    # Chanfrein14
    chanfrein14_edges = [part.edges().sort_by_distance(p)[0] for p in [
        (0, 95.4, -27.2),
    ]]
    chanfrein14_side = [part.faces().sort_by_distance(p)[0] for p in [
        (0, 95.4, 8.9),
    ]]
    chamfer(chanfrein14_edges, length=CHANFREIN14_SIZE, length2=CHANFREIN14_SIZE2, reference=chanfrein14_side[0])

    # Esquisse40 → Enlèv. mat.-Extru.9 (cut)
    with BuildSketch(Plane(origin=(0, 103, 0), x_dir=(1, 0, 0), z_dir=(0, 1, 0))):
        Rectangle(ESQUISSE40_W, ESQUISSE40_H)
    extrude(amount=-ENL_V_MAT_EXTRU_9_DEPTH, mode=Mode.SUBTRACT)

    # Esquisse41 → Enlèv. mat.-Extru.11 (cut)
    with BuildSketch(Plane(origin=(0, 79, 0), x_dir=(1, 0, 0), z_dir=(0, 1, 0))):
        with Locations((0, 36.1)):
            Rectangle(ESQUISSE41_W, ESQUISSE41_H)
    extrude(amount=-ENL_V_MAT_EXTRU_11_DEPTH, mode=Mode.SUBTRACT)


solid = part.part
